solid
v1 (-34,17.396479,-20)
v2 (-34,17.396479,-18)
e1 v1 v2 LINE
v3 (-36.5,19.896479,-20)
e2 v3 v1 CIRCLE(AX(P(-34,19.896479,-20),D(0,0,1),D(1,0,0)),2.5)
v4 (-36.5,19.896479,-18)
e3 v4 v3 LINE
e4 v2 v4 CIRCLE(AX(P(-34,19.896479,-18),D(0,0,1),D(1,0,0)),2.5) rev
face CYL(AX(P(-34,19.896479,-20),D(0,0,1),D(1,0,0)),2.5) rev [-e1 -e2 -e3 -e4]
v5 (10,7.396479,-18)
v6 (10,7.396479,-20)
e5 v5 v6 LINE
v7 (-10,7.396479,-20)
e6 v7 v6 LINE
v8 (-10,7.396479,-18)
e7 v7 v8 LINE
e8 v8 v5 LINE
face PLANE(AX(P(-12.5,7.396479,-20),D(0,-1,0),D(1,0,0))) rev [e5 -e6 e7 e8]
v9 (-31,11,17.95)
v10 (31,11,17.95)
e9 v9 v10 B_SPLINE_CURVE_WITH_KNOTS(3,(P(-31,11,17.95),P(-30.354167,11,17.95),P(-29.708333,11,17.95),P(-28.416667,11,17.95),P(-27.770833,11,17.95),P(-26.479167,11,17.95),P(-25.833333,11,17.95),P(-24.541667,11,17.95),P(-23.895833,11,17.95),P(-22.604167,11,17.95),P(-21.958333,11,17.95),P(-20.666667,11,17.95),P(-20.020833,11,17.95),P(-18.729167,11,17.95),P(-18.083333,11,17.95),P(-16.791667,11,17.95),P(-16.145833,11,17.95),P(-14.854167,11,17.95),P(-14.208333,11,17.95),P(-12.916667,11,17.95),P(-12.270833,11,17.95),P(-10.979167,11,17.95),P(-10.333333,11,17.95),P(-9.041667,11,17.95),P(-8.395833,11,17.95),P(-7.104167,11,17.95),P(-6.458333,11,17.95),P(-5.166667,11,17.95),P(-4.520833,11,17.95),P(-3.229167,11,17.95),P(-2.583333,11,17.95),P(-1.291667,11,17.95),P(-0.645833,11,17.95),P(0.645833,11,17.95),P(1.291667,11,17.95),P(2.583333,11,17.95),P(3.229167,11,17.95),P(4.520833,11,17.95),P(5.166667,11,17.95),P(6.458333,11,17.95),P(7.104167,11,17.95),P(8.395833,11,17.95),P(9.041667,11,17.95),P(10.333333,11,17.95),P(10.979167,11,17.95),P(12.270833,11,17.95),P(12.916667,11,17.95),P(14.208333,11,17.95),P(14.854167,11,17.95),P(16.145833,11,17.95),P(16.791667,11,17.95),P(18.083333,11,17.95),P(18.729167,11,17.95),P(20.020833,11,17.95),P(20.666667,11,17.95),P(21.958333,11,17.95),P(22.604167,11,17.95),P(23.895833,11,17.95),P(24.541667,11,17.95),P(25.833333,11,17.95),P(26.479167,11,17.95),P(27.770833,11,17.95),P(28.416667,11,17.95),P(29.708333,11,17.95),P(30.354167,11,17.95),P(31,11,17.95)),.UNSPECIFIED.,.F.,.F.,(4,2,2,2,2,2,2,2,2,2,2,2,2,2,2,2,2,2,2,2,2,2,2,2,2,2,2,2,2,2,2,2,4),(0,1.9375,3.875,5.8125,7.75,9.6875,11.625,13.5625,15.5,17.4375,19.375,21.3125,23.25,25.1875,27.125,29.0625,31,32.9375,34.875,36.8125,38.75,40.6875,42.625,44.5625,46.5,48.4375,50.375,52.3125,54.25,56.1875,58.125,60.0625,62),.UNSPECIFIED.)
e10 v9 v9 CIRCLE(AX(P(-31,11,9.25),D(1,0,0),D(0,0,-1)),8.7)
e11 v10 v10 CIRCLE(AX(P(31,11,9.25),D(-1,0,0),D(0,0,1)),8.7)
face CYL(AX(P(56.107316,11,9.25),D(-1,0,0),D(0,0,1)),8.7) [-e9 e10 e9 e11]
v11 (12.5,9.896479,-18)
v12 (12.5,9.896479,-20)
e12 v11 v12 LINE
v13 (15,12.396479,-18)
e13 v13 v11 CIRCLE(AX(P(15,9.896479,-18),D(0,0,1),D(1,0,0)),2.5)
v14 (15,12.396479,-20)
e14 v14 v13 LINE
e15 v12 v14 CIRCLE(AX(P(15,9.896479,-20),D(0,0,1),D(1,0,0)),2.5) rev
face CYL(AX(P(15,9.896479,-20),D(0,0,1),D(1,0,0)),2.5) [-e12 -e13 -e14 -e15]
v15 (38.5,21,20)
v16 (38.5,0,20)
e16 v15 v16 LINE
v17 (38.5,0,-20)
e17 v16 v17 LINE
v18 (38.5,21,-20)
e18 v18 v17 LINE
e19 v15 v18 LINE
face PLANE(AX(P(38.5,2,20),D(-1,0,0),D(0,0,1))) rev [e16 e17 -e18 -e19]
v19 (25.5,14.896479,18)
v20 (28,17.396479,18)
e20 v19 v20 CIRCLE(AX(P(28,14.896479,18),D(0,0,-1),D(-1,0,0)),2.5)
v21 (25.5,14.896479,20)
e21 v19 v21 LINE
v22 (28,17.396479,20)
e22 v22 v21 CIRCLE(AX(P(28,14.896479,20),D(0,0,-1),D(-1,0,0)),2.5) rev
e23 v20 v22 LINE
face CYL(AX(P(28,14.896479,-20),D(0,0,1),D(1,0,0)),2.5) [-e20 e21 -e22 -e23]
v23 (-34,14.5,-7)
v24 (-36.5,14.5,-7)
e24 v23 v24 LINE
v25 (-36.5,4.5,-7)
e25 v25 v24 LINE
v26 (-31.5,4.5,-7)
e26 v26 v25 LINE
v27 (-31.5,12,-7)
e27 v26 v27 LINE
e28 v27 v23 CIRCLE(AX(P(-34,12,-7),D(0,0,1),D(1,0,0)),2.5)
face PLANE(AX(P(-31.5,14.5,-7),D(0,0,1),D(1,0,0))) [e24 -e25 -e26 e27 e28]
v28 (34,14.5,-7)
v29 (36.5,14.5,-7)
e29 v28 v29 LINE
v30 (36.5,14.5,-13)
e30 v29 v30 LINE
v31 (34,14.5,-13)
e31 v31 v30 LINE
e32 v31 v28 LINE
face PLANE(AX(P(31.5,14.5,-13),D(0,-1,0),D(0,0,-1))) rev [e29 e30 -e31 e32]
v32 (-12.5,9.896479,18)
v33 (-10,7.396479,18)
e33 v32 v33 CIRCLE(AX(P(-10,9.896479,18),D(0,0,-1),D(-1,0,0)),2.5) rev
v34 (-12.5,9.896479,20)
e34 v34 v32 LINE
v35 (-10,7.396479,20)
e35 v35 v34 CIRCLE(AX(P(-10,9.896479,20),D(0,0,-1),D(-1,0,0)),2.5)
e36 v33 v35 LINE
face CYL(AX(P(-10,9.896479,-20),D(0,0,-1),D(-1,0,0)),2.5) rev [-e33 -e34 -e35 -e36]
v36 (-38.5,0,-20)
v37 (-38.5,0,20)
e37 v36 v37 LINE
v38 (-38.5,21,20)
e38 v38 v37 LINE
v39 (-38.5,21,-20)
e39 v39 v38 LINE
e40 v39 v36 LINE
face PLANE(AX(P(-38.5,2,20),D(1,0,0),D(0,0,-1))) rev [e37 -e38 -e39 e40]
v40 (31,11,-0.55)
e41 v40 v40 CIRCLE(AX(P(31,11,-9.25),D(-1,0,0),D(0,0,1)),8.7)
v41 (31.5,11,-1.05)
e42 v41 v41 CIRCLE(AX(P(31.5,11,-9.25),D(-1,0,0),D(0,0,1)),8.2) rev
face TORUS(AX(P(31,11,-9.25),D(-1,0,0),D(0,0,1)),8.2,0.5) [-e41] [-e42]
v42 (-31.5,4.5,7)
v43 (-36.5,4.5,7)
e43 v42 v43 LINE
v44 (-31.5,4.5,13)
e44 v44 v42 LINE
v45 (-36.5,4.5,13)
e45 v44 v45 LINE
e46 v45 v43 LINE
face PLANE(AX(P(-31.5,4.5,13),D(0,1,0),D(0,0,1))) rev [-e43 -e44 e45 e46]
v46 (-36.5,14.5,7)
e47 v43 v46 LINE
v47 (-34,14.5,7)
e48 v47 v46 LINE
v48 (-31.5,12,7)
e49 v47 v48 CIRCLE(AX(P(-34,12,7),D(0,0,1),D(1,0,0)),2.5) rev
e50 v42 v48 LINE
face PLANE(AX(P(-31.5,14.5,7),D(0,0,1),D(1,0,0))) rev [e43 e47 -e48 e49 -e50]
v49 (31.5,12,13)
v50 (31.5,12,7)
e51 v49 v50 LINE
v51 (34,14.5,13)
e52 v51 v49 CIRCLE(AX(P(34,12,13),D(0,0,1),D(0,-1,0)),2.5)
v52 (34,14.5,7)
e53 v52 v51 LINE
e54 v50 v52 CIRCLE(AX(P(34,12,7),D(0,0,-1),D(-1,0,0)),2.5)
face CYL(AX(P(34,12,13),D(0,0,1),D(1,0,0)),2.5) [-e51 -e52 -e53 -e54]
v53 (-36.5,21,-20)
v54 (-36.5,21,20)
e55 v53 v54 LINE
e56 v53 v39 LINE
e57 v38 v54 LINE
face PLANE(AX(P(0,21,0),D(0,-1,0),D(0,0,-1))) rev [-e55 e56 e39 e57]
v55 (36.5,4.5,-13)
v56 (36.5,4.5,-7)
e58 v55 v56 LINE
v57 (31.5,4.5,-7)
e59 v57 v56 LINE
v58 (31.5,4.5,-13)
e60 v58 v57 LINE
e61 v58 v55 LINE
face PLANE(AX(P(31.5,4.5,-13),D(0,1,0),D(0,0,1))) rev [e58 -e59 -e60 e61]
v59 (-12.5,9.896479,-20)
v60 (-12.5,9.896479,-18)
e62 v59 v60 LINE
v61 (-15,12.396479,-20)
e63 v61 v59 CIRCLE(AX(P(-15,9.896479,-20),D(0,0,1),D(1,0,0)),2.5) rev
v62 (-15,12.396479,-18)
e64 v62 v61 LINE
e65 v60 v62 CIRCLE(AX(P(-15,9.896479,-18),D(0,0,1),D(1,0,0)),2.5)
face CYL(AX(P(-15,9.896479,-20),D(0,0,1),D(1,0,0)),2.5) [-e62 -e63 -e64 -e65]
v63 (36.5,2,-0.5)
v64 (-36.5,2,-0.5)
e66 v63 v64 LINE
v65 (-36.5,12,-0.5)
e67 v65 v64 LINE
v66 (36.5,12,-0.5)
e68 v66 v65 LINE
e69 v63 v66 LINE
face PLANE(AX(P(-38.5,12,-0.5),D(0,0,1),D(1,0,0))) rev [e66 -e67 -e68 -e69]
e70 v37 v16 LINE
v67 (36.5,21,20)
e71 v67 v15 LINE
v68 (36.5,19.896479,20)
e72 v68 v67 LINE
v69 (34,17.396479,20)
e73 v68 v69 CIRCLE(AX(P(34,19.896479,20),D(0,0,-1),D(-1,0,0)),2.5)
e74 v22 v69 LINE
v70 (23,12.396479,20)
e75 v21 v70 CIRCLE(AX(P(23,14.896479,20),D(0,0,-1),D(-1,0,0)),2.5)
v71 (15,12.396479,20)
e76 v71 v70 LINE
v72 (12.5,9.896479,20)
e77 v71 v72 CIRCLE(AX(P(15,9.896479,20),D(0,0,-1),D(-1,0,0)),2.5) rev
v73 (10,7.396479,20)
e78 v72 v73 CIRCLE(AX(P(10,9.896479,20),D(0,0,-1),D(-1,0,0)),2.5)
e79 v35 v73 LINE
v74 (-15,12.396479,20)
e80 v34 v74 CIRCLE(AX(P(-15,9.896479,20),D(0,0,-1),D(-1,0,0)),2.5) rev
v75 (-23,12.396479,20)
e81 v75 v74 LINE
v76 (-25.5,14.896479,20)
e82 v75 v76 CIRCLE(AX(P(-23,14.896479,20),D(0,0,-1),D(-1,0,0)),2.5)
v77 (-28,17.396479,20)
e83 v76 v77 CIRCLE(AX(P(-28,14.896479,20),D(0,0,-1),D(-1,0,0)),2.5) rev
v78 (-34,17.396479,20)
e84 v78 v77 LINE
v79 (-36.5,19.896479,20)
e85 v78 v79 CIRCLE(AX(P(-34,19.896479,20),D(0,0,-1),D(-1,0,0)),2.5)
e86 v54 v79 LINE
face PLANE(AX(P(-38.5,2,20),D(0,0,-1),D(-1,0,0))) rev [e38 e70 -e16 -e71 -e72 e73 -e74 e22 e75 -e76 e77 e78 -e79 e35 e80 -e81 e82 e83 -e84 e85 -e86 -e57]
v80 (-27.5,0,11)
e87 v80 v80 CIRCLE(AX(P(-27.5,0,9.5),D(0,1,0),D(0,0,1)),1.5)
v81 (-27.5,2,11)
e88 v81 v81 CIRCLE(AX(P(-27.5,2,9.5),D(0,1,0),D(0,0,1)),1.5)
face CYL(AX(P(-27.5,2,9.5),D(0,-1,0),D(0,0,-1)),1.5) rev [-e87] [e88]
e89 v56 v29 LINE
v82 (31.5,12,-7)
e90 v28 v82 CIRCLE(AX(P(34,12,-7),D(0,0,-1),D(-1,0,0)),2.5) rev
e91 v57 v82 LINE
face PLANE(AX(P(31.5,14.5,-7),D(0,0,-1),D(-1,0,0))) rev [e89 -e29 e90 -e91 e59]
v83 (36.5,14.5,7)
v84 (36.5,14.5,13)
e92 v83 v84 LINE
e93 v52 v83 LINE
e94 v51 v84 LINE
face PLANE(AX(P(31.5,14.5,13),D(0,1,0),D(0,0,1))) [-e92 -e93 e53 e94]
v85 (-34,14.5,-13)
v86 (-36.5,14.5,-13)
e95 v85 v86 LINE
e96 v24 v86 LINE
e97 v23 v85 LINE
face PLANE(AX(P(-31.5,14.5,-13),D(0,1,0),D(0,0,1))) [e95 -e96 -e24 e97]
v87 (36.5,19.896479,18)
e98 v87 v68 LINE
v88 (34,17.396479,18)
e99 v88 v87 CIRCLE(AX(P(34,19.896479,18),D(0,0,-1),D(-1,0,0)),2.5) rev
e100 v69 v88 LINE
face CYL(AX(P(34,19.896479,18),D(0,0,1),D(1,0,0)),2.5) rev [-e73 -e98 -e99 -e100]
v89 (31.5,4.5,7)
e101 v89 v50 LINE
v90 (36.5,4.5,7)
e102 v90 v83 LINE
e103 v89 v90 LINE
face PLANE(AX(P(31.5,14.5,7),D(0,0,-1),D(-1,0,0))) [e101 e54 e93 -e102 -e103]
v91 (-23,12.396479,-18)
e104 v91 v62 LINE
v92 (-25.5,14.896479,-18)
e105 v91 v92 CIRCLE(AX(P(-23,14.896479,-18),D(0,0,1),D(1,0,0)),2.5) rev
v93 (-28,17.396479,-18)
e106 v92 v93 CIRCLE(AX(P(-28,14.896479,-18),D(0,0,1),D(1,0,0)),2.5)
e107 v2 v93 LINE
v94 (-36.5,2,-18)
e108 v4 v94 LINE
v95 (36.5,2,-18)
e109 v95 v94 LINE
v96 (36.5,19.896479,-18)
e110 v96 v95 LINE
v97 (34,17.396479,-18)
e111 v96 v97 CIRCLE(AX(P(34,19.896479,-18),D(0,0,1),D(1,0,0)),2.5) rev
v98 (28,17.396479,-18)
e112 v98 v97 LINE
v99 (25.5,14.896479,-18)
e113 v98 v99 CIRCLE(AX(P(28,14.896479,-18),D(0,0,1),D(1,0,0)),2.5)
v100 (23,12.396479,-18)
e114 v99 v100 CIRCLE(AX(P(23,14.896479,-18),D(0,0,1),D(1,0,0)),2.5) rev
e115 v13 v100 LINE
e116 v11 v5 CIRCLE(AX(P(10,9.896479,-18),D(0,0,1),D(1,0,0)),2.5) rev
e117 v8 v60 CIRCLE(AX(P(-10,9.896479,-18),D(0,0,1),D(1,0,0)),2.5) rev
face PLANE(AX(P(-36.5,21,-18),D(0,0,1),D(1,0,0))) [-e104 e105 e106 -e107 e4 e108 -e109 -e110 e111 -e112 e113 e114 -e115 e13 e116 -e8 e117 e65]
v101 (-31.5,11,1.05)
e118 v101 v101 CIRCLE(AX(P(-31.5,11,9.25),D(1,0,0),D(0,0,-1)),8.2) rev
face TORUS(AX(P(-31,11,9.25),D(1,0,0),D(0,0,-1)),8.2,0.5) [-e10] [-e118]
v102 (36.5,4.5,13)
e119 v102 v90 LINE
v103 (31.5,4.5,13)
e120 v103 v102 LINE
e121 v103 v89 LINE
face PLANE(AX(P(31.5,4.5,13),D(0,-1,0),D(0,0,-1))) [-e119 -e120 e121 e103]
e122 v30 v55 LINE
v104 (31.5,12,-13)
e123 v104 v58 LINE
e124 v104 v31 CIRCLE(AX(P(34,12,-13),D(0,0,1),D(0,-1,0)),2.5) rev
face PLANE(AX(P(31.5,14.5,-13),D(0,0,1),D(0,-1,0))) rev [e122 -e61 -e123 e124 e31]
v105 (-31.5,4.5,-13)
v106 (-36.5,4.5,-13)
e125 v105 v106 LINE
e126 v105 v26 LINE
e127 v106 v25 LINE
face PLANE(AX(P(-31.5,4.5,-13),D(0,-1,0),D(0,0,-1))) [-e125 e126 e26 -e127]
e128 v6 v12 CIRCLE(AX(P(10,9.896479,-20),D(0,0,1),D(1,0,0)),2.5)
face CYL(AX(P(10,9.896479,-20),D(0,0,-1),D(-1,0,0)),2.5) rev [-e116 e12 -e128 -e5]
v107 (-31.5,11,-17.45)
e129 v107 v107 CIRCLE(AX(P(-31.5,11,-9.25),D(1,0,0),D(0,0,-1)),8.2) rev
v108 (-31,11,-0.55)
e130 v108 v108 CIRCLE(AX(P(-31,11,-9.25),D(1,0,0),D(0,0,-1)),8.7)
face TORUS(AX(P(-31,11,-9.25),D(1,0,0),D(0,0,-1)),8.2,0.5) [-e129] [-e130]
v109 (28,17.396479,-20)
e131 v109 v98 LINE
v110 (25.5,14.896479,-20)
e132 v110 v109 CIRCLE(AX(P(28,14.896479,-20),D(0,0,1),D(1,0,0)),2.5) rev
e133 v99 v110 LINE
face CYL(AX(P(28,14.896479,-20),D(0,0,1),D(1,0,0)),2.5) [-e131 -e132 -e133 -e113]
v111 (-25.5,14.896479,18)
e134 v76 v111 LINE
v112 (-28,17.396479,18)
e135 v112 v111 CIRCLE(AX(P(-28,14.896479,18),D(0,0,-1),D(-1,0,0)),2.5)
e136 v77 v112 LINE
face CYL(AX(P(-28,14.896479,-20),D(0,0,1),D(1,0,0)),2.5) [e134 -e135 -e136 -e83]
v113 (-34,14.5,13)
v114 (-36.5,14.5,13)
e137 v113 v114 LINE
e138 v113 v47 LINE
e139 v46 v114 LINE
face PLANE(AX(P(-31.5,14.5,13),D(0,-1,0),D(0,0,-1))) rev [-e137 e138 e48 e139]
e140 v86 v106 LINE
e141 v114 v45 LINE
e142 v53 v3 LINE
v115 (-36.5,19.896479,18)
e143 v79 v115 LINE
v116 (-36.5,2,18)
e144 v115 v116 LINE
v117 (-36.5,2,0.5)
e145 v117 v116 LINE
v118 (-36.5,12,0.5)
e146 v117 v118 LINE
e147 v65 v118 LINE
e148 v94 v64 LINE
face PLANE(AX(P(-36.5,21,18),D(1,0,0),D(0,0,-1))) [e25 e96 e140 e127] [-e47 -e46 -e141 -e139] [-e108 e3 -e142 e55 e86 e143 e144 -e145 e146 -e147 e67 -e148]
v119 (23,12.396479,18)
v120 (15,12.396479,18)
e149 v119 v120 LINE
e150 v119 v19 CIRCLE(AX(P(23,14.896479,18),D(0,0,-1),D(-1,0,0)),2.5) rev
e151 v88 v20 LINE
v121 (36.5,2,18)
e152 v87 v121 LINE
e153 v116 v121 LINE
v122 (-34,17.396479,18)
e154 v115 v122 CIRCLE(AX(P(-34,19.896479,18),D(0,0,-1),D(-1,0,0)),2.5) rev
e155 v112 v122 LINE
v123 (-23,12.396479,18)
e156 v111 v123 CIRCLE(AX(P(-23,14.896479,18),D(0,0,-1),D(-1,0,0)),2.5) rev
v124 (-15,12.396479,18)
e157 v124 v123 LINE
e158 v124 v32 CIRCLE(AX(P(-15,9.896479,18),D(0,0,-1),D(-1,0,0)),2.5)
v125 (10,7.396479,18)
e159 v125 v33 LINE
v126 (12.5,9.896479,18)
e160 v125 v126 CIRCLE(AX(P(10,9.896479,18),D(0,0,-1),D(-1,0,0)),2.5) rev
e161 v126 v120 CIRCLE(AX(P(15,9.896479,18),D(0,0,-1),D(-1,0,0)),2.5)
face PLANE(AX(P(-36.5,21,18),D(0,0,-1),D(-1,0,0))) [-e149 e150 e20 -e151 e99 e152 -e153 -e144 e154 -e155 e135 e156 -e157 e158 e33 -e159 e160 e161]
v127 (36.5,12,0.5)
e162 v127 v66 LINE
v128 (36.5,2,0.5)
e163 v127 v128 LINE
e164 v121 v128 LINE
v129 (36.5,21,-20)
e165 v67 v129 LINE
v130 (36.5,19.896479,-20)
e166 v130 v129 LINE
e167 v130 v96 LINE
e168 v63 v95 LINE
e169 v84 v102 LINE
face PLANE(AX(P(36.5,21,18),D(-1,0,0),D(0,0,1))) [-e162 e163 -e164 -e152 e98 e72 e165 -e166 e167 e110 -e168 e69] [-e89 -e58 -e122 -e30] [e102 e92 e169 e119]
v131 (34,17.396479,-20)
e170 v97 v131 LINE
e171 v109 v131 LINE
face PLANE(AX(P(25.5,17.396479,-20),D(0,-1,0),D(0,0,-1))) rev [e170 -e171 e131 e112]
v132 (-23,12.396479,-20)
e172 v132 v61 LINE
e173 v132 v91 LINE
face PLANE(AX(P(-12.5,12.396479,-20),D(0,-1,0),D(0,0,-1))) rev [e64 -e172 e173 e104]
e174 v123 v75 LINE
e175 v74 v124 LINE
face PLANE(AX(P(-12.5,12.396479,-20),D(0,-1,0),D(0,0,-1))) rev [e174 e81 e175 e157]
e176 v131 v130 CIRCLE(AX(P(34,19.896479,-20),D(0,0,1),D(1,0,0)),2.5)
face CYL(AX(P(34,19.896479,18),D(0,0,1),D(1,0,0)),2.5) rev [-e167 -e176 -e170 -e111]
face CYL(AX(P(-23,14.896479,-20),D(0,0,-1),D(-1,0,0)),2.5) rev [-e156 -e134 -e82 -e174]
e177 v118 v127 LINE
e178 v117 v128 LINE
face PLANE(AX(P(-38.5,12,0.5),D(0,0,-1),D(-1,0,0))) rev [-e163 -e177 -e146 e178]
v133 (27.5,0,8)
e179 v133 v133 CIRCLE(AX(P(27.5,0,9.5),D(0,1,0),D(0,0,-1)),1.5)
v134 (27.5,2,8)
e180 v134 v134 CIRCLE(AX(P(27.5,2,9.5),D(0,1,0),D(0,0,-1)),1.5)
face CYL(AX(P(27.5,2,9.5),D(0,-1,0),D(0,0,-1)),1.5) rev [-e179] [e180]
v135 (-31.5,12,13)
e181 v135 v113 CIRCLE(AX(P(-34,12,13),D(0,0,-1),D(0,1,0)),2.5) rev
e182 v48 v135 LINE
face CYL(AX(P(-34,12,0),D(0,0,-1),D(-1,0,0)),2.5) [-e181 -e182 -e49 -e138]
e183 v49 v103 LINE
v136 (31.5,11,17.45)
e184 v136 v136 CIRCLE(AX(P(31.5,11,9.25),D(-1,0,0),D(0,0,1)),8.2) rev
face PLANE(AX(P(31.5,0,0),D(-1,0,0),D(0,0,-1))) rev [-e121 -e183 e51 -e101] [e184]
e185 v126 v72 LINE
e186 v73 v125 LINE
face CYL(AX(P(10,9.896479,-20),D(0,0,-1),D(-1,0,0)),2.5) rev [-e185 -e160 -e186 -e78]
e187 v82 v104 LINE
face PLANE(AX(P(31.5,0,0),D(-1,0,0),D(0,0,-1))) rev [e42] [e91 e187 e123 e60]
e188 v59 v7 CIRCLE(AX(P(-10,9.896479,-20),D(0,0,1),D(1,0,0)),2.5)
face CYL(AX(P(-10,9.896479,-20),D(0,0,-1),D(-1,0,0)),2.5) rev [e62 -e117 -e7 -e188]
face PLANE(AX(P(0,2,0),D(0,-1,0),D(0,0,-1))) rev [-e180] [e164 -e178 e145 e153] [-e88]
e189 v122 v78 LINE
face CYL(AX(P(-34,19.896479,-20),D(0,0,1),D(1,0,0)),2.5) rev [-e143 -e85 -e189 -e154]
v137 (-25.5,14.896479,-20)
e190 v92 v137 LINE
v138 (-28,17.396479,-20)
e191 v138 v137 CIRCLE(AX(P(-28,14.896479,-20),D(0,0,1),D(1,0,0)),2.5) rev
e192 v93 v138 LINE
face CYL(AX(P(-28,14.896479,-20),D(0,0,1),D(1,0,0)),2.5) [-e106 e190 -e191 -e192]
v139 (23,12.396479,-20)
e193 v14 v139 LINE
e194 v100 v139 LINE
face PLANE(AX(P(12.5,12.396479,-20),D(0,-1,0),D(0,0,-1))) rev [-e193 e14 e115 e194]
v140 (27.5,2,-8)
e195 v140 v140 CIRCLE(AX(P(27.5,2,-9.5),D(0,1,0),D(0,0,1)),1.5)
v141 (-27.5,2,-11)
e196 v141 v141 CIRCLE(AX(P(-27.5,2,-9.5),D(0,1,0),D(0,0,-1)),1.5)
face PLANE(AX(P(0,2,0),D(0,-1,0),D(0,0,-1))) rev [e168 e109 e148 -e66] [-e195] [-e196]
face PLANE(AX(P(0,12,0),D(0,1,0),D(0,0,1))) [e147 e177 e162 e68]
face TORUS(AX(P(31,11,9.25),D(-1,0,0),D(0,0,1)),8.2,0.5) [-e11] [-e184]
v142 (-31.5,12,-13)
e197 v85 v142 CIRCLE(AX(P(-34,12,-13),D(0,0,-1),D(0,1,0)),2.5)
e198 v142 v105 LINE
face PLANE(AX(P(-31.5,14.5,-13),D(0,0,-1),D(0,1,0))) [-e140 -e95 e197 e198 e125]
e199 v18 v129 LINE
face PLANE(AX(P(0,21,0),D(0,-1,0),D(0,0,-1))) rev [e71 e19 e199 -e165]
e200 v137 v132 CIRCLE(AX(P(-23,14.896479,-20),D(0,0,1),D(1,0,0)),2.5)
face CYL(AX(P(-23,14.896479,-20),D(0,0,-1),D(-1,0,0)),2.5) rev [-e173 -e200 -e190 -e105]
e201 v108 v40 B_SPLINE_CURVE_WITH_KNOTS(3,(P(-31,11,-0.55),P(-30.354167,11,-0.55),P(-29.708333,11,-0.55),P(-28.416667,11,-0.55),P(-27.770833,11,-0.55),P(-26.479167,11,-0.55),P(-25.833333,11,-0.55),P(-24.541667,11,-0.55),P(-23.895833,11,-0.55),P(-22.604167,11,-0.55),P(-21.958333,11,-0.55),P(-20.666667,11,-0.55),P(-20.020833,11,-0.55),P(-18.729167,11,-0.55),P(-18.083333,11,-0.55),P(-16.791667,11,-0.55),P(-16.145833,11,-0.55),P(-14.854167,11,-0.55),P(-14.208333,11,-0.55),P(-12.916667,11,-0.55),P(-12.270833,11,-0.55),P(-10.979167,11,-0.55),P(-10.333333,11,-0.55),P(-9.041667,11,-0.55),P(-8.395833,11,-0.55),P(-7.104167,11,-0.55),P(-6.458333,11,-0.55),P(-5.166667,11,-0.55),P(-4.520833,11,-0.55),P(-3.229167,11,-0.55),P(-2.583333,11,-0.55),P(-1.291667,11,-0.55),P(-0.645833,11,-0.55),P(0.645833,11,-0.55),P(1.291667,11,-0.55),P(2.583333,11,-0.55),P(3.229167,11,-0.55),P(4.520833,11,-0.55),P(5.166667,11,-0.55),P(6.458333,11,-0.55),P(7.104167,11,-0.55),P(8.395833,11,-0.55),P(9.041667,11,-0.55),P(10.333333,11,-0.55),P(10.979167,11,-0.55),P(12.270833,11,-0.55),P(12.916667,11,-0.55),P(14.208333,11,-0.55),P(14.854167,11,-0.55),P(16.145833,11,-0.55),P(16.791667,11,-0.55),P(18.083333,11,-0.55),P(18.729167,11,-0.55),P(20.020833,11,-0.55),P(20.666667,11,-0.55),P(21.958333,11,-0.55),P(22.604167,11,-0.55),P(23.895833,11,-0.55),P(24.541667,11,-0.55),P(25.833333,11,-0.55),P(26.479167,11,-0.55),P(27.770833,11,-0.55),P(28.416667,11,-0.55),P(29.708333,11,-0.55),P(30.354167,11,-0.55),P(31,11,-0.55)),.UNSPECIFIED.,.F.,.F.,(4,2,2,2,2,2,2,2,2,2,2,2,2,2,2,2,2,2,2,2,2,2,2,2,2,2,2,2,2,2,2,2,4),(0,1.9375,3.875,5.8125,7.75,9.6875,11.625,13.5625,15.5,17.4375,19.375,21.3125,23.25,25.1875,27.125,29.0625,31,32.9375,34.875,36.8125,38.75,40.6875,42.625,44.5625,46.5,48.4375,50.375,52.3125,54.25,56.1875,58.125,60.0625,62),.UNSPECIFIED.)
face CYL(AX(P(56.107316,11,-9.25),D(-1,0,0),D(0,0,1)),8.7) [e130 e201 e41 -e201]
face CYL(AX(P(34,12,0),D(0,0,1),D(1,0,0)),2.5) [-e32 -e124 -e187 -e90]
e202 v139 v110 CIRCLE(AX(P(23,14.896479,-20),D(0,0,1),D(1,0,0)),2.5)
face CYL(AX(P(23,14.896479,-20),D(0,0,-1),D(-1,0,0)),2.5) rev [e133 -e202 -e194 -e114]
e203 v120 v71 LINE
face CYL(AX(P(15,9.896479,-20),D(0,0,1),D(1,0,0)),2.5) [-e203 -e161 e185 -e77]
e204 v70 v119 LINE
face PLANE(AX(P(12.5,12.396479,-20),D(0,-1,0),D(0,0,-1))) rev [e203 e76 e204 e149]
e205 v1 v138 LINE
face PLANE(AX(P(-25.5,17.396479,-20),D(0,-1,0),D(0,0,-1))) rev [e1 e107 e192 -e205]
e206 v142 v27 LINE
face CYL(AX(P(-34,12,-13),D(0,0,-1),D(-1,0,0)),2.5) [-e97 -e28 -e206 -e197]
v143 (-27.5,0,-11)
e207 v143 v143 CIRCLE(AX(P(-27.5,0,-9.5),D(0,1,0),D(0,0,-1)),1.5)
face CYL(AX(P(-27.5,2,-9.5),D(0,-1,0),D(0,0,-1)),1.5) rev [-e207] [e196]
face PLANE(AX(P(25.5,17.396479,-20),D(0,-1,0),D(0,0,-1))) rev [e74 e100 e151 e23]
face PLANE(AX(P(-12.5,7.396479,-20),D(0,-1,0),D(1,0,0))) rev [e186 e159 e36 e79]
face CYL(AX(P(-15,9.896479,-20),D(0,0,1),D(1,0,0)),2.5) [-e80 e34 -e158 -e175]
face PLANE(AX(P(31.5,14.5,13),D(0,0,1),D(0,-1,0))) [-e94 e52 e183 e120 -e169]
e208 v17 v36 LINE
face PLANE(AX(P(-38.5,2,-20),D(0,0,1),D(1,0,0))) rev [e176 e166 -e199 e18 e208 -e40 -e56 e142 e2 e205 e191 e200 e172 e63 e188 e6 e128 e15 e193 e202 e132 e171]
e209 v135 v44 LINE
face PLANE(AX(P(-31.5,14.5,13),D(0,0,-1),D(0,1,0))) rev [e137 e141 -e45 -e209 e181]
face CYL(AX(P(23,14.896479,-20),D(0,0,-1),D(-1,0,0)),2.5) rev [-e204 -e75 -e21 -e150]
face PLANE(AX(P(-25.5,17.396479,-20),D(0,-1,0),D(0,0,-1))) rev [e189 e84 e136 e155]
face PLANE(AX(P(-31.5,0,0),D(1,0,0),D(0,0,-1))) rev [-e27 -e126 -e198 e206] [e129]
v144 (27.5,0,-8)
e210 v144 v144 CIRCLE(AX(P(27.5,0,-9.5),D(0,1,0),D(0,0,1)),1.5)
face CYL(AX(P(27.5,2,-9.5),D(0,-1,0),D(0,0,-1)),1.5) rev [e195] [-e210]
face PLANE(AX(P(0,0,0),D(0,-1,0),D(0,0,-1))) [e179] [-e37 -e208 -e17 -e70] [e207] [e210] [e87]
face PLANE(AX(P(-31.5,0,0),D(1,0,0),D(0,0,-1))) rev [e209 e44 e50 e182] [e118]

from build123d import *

# Parameters (mm, degrees)
SZKIC1_W                                = 77
SZKIC1_H                                = 40
SZKIC1_R                                = 1.5
DODANIE_WYCI_GNI_CIE1_DEPTH             = 2
SZKIC2_W                                = 77
SZKIC2_H                                = 40
SZKIC2_W_2                              = 73
SZKIC2_H_2                              = 36
DODANIE_WYCI_GNI_CIE2_DEPTH             = 19
WYTNIJ_WYCI_GNI_CIE1_DEPTH              = 60.356970947
ZAOKR_GLENIE1_R                         = 2.5
SZKIC4_W                                = 77
SZKIC4_H                                = 1
DODANIE_WYCI_GNI_CIE3_DEPTH             = 10
SZKIC5_W                                = 6
SZKIC5_H                                = 10
DODANIE_WYCI_GNI_CIE4_DEPTH             = 5
ZAOKR_GLENIE2_R                         = 2.5
ZAOKR_GLENIE2_OF_LUSTRO1_R              = 2.5
LUSTRO2_START                           = -13
LUSTRO2_DEPTH                           = 6
LUSTRO2_START_2                         = 7
LUSTRO2_2_DEPTH                         = 6
DODANIE_WYCI_GNI_CIE5_REACH             = 50.2
SZKIC6_R                                = 8.7
DODANIE_WYCI_GNI_CIE5_DIRECTION_2_REACH = 50.2
ZAOKR_GLENIE3_R                         = 0.5


# Read off the part's stored shape, not the designer's step: Lustro2
with BuildPart() as part:
    # Szkic1 → Dodanie-wyciągnięcie1 (new body)
    with BuildSketch(Plane(origin=(0, 0, 0), x_dir=(1, 0, 0), z_dir=(0, 1, 0))):
        Rectangle(SZKIC1_W, SZKIC1_H)
        with Locations(Location((27.5, 9.5, 0), (0, 0, 270))):
            Circle(SZKIC1_R, mode=Mode.SUBTRACT)
        with Locations(Location((27.5, -9.5, 0), (0, 0, 90))):
            Circle(SZKIC1_R, mode=Mode.SUBTRACT)
        with Locations(Location((-27.5, -9.5, 0), (0, 0, 270))):
            Circle(SZKIC1_R, mode=Mode.SUBTRACT)
        with Locations(Location((-27.5, 9.5, 0), (0, 0, 90))):
            Circle(SZKIC1_R, mode=Mode.SUBTRACT)
    extrude(amount=DODANIE_WYCI_GNI_CIE1_DEPTH)

    # Szkic2 → Dodanie-wyciągnięcie2 (add)
    with BuildSketch(Plane(origin=(0, 2, 0), x_dir=(1, 0, 0), z_dir=(0, 1, 0))):
        Rectangle(SZKIC2_W, SZKIC2_H)
        Rectangle(SZKIC2_W_2, SZKIC2_H_2, mode=Mode.SUBTRACT)
    extrude(amount=DODANIE_WYCI_GNI_CIE2_DEPTH)

    # Szkic3 → Wytnij-wyciągnięcie1 (cut, through all)
    with BuildSketch(Plane.XY.offset(20)):
        Polygon((-12.5, 7.396479256), (12.5, 7.396479256), (12.5, 12.396479256), (25.5, 12.396479256), (25.5, 17.396479256), (36.5, 17.396479256), (36.5, 21), (-36.5, 21), (-36.5, 17.396479256), (-25.5, 17.396479256), (-25.5, 12.396479256), (-12.5, 12.396479256), align=None)
    extrude(amount=-WYTNIJ_WYCI_GNI_CIE1_DEPTH, mode=Mode.SUBTRACT)

    # Zaokrąglenie1
    zaokr_glenie1_edges = [part.edges().sort_by_distance(p)[0] for p in [
        (36.5, 17.396479256, 19),
        (25.5, 17.396479256, 19),
        (25.5, 12.396479256, 19),
        (12.5, 12.396479256, 19),
        (12.5, 7.396479256, 19),
        (-36.5, 17.396479256, 19),
        (-25.5, 17.396479256, 19),
        (-25.5, 12.396479256, 19),
        (-12.5, 12.396479256, 19),
        (-12.5, 7.396479256, 19),
        (12.5, 7.396479256, -19),
        (12.5, 12.396479256, -19),
        (25.5, 12.396479256, -19),
        (36.5, 17.396479256, -19),
        (25.5, 17.396479256, -19),
        (-12.5, 7.396479256, -19),
        (-12.5, 12.396479256, -19),
        (-36.5, 17.396479256, -19),
        (-25.5, 17.396479256, -19),
        (-25.5, 12.396479256, -19),
    ]]
    fillet(zaokr_glenie1_edges, radius=ZAOKR_GLENIE1_R - 0.0001)  # a hair under: the kernel refuses the full size

    # Szkic4 → Dodanie-wyciągnięcie3 (add)
    with BuildSketch(Plane(origin=(0, 2, 0), x_dir=(1, 0, 0), z_dir=(0, 1, 0))):
        Rectangle(SZKIC4_W, SZKIC4_H)
    extrude(amount=DODANIE_WYCI_GNI_CIE3_DEPTH)

    # Szkic5 → Dodanie-wyciągnięcie4 (add)
    with BuildSketch(Plane(origin=(-36.5, 0, 0), x_dir=(0, 0, -1), z_dir=(1, 0, 0))):
        with Locations((-10, 9.5)):
            Rectangle(SZKIC5_W, SZKIC5_H)
    dodanie_wyci_gni_cie4 = extrude(amount=DODANIE_WYCI_GNI_CIE4_DEPTH)

    # Zaokrąglenie2
    zaokr_glenie2_edges = [part.edges().sort_by_distance(p)[0] for p in [
        (-31.5, 14.5, 10),
    ]]
    fillet(zaokr_glenie2_edges, radius=ZAOKR_GLENIE2_R)

    # Lustro1: Dodanie-wyciągnięcie4 across plane
    add(dodanie_wyci_gni_cie4.mirror(Plane.XY))

    # Zaokrąglenie2 of Lustro1
    zaokr_glenie2_of_lustro1_edges = [part.edges().sort_by_distance(p)[0] for p in [
        (-31.5, 14.5, -10),
    ]]
    fillet(zaokr_glenie2_of_lustro1_edges, radius=ZAOKR_GLENIE2_OF_LUSTRO1_R)

    # Lustro2 outline → Lustro2 (add)
    with BuildSketch(Plane.XY.offset(LUSTRO2_START)):
        with BuildLine():
            Line((36.5, 14.5), (34, 14.5))
            ThreePointArc((34, 14.5), (32.232233047, 13.767766953), (31.5, 12))
            Line((31.5, 12), (31.5, 4.5))
            Line((31.5, 4.5), (36.5, 4.5))
            Line((36.5, 4.5), (36.5, 14.5))
        make_face()
    extrude(amount=LUSTRO2_DEPTH)

    # Lustro2 2 outline → Lustro2 2 (add)
    with BuildSketch(Plane.XY.offset(LUSTRO2_START_2)):
        with BuildLine():
            Line((36.5, 14.5), (34, 14.5))
            ThreePointArc((34, 14.5), (32.232233047, 13.767766953), (31.5, 12))
            Line((31.5, 12), (31.5, 4.5))
            Line((31.5, 4.5), (36.5, 4.5))
            Line((36.5, 4.5), (36.5, 14.5))
        make_face()
    extrude(amount=LUSTRO2_2_DEPTH)

    # Dodanie-wyciągnięcie5: up to this face of the body (flat: up to its plane)
    dodanie_wyci_gni_cie5_end = Plane(part.part.faces().sort_by_distance((31.5, 8.25, 10))[0])
    # Szkic6 → Dodanie-wyciągnięcie5 (add, up to the picked face)
    with BuildSketch(Plane(origin=(0, 0, 0), x_dir=(0, 0, -1), z_dir=(1, 0, 0)), mode=Mode.PRIVATE) as dodanie_wyci_gni_cie5_sk1:
        with Locations(Location((-9.25, 11, 0), (0, 0, 180))):
            Circle(SZKIC6_R)
    dodanie_wyci_gni_cie5_tool1 = split(extrude(dodanie_wyci_gni_cie5_sk1.sketch, amount=DODANIE_WYCI_GNI_CIE5_REACH, mode=Mode.PRIVATE), bisect_by=dodanie_wyci_gni_cie5_end, keep=Keep.BOTH, mode=Mode.PRIVATE)
    # Szkic6 → Dodanie-wyciągnięcie5 (add, up to the picked face)
    with BuildSketch(Plane(origin=(0, 0, 0), x_dir=(0, 0, -1), z_dir=(1, 0, 0)), mode=Mode.PRIVATE) as dodanie_wyci_gni_cie5_sk2:
        with Locations(Location((9.25, 11, 0), (0, 0, 180))):
            Circle(SZKIC6_R)
    dodanie_wyci_gni_cie5_tool2 = split(extrude(dodanie_wyci_gni_cie5_sk2.sketch, amount=DODANIE_WYCI_GNI_CIE5_REACH, mode=Mode.PRIVATE), bisect_by=dodanie_wyci_gni_cie5_end, keep=Keep.BOTH, mode=Mode.PRIVATE)
    add(dodanie_wyci_gni_cie5_tool1.solids().sort_by(Axis((0, 11, 9.25), (1, 0, 0)))[0])
    add(dodanie_wyci_gni_cie5_tool2.solids().sort_by(Axis((0, 11, -9.25), (1, 0, 0)))[0])

    # Dodanie-wyciągnięcie5 direction 2: up to this face of the body (flat: up to its plane)
    dodanie_wyci_gni_cie5_direction_2_end = Plane(part.part.faces().sort_by_distance((-31.5, 8.25, 10))[0])
    # Szkic6 → Dodanie-wyciągnięcie5 direction 2 (add, up to the picked face)
    with BuildSketch(Plane(origin=(0, 0, 0), x_dir=(0, 0, -1), z_dir=(1, 0, 0)), mode=Mode.PRIVATE) as dodanie_wyci_gni_cie5_direction_2_sk1:
        with Locations(Location((-9.25, 11, 0), (0, 0, 180))):
            Circle(SZKIC6_R)
    dodanie_wyci_gni_cie5_direction_2_tool1 = split(extrude(dodanie_wyci_gni_cie5_direction_2_sk1.sketch, amount=-DODANIE_WYCI_GNI_CIE5_DIRECTION_2_REACH, mode=Mode.PRIVATE), bisect_by=dodanie_wyci_gni_cie5_direction_2_end, keep=Keep.BOTH, mode=Mode.PRIVATE)
    # Szkic6 → Dodanie-wyciągnięcie5 direction 2 (add, up to the picked face)
    with BuildSketch(Plane(origin=(0, 0, 0), x_dir=(0, 0, -1), z_dir=(1, 0, 0)), mode=Mode.PRIVATE) as dodanie_wyci_gni_cie5_direction_2_sk2:
        with Locations(Location((9.25, 11, 0), (0, 0, 180))):
            Circle(SZKIC6_R)
    dodanie_wyci_gni_cie5_direction_2_tool2 = split(extrude(dodanie_wyci_gni_cie5_direction_2_sk2.sketch, amount=-DODANIE_WYCI_GNI_CIE5_DIRECTION_2_REACH, mode=Mode.PRIVATE), bisect_by=dodanie_wyci_gni_cie5_direction_2_end, keep=Keep.BOTH, mode=Mode.PRIVATE)
    add(dodanie_wyci_gni_cie5_direction_2_tool1.solids().sort_by(Axis((0, 11, 9.25), (-1, 0, 0)))[0])
    add(dodanie_wyci_gni_cie5_direction_2_tool2.solids().sort_by(Axis((0, 11, -9.25), (-1, 0, 0)))[0])

    # Zaokrąglenie3
    zaokr_glenie3_edges = [part.edges().sort_by_distance(p)[0] for p in [
        (-31.5, 11, 0.55),
        (31.5, 11, 0.55),
        (31.5, 11, -17.95),
        (-31.5, 11, -17.95),
    ]]
    fillet(zaokr_glenie3_edges, radius=ZAOKR_GLENIE3_R)


solid = part.part
